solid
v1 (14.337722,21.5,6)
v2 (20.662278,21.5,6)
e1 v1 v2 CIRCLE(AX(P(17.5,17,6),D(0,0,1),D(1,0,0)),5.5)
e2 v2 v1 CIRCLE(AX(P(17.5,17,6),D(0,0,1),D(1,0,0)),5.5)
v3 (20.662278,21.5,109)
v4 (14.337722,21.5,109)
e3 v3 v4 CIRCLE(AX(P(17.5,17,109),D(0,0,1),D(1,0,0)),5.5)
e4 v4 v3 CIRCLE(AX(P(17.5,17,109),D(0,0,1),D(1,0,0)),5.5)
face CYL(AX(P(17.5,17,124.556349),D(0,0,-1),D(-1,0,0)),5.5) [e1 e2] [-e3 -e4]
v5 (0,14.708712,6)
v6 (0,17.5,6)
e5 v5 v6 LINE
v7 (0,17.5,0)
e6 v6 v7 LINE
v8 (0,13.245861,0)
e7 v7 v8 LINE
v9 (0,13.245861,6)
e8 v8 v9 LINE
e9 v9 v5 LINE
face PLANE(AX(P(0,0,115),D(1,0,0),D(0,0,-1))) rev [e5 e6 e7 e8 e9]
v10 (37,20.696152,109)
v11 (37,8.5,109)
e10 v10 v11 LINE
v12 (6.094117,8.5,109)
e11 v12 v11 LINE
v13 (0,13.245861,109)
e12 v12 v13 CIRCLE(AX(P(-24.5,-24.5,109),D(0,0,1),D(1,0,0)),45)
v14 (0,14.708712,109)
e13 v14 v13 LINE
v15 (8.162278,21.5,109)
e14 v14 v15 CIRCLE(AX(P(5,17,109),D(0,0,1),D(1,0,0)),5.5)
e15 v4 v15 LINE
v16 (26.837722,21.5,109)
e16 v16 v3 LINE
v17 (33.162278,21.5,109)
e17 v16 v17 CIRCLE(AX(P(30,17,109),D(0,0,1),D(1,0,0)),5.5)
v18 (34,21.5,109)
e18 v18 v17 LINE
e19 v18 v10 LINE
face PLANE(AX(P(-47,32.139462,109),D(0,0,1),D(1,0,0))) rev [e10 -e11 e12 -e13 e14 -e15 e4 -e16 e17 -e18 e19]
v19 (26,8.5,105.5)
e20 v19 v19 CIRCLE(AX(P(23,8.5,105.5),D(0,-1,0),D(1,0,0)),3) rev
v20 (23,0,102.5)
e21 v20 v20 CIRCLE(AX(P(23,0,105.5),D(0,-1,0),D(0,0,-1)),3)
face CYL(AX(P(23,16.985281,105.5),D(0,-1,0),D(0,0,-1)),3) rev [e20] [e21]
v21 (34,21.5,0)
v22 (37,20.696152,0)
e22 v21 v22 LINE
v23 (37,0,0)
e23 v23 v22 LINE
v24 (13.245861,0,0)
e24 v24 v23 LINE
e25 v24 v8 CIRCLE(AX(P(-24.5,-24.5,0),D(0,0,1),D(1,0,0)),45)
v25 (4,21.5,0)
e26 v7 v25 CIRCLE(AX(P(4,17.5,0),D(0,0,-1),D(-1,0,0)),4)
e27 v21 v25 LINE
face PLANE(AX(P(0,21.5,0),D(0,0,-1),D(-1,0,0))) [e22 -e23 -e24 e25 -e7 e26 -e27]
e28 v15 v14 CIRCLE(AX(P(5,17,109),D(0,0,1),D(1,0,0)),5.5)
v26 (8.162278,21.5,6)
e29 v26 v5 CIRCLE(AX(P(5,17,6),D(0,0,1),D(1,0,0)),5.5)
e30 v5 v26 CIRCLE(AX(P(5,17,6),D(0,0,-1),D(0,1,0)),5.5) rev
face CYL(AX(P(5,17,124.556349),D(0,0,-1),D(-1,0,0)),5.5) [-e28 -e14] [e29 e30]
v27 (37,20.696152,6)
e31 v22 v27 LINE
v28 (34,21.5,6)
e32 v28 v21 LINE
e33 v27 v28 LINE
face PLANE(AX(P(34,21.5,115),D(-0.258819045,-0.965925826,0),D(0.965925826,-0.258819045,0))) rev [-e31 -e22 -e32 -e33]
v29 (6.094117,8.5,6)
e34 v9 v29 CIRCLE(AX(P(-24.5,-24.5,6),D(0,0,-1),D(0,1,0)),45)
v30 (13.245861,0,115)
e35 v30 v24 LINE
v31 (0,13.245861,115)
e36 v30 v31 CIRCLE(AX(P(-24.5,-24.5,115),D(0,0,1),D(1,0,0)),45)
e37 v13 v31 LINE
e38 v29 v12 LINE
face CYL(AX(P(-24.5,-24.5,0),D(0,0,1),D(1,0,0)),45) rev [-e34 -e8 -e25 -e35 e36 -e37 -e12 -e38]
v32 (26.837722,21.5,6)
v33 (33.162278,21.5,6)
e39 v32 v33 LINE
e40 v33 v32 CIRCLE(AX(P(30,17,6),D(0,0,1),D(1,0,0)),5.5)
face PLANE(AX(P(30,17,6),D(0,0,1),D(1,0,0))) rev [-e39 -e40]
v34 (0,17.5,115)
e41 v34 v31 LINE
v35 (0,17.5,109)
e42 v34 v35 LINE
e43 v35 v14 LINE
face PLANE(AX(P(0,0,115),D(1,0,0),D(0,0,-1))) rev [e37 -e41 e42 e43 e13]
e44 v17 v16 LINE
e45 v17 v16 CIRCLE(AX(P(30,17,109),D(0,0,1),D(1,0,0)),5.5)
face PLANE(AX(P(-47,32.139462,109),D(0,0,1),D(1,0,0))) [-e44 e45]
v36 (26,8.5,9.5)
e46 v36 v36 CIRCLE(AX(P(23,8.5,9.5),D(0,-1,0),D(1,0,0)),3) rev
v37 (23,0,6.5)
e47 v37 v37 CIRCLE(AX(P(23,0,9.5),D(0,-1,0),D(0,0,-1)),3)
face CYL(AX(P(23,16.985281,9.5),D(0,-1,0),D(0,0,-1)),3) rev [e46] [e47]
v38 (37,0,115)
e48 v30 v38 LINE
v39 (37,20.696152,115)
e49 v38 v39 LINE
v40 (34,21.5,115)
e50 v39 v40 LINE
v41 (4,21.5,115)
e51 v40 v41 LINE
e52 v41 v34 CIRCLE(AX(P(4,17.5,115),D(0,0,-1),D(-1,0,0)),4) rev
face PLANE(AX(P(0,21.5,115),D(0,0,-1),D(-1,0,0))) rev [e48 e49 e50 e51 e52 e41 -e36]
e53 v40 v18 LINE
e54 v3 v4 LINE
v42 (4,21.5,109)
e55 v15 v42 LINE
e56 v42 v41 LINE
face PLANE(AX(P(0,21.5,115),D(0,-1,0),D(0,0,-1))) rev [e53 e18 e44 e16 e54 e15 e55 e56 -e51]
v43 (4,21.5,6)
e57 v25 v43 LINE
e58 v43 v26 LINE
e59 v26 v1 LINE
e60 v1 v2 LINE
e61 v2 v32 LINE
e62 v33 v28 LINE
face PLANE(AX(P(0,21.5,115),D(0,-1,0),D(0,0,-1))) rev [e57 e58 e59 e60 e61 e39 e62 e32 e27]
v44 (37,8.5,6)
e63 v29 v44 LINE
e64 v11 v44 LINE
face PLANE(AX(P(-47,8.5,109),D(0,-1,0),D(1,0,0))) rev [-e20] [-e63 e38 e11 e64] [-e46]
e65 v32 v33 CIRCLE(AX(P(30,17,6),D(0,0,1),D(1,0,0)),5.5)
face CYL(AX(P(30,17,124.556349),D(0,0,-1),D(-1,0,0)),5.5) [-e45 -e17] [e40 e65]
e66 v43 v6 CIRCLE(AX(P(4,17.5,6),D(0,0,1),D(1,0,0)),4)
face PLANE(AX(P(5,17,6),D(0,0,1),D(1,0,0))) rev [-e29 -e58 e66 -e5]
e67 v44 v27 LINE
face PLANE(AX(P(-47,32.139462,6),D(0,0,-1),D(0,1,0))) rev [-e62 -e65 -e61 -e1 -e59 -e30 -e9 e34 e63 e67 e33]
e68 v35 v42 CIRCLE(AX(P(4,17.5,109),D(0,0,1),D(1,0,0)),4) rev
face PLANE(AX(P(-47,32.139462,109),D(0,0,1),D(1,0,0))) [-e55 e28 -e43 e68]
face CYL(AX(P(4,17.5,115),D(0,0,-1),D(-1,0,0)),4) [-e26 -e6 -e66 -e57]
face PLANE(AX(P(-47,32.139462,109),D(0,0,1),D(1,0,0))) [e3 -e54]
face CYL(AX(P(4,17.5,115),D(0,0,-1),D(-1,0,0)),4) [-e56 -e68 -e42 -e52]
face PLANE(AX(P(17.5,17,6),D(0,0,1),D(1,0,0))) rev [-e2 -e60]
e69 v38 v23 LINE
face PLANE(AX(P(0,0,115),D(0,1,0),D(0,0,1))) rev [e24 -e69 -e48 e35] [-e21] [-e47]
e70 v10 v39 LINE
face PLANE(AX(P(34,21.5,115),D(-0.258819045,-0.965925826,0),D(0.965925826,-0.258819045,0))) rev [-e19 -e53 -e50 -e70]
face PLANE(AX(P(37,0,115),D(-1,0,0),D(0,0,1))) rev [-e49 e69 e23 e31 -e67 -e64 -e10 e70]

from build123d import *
from OCP.BRepFilletAPI import BRepFilletAPI_MakeChamfer

# Parameters (mm, degrees)
SCHIZZO1_W               = 37
SCHIZZO1_H               = 21.5
ESTRUSIONE1_DEPTH        = 115
SCHIZZO6_W               = 103
SCHIZZO6_H               = 23.639461627
TAGLIO_ESTRUSIONE4_DEPTH = 84
SCHIZZO7_R               = 5.5
ESTRUSIONE4_DEPTH        = 103
SMUSSO1_SIZE             = 3
SMUSSO1_SIZE2            = 0.803847577
RACCORDO1_R              = 4
SCHIZZO8_R               = 45
TAGLIO_ESTRUSIONE5_DEPTH = 123.883074506
SCHIZZO9_R               = 3
TAGLIO_ESTRUSIONE6_DEPTH = 8.5


with BuildPart() as part:
    # Schizzo1 → Estrusione1 (new body)
    with BuildSketch(Plane.XY):
        with Locations((18.5, 10.75)):
            Rectangle(SCHIZZO1_W, SCHIZZO1_H)
    extrude(amount=ESTRUSIONE1_DEPTH)

    # Schizzo6 → Taglio-Estrusione4 (cut)
    with BuildSketch(Plane(origin=(37, 0, 0), x_dir=(0, 0, -1), z_dir=(1, 0, 0))):
        with Locations((-57.5, 20.319730814)):
            Rectangle(SCHIZZO6_W, SCHIZZO6_H)
    extrude(amount=-TAGLIO_ESTRUSIONE4_DEPTH, mode=Mode.SUBTRACT)

    # Schizzo7 → Estrusione4 (add)
    with BuildSketch(Plane.XY.offset(6)):
        with Locations(Location((5, 17, 0), (0, 0, 155.380022671))):
            Circle(SCHIZZO7_R)
        with Locations(Location((17.5, 17, 0), (0, 0, 125.096801228))):
            Circle(SCHIZZO7_R)
        with Locations(Location((30, 17, 0), (0, 0, 125.096801228))):
            Circle(SCHIZZO7_R)
    extrude(amount=ESTRUSIONE4_DEPTH)

    # Smusso1: one chamfer whose edges measure the first distance from different faces: ONE call of the kernel's chamfer builder (chamfer() names one face for all edges)
    smusso1_edges_1 = [part.edges().sort_by_distance(p)[0] for p in [
        (37, 21.5, 3),
    ]]
    smusso1_side_1 = [part.faces().sort_by_distance(p)[0] for p in [
        (18.5, 21.5, 3),
    ]]
    smusso1_edges_2 = [part.edges().sort_by_distance(p)[0] for p in [
        (37, 21.5, 112),
    ]]
    smusso1_side_2 = [part.faces().sort_by_distance(p)[0] for p in [
        (18.5, 21.5, 112),
    ]]
    smusso1 = BRepFilletAPI_MakeChamfer(part.part.solid().wrapped)
    for e in smusso1_edges_1:
        smusso1.Add(SMUSSO1_SIZE, SMUSSO1_SIZE2, e.wrapped, smusso1_side_1[0].wrapped)  # the first distance lies on this face
    for e in smusso1_edges_2:
        smusso1.Add(SMUSSO1_SIZE, SMUSSO1_SIZE2, e.wrapped, smusso1_side_2[0].wrapped)  # the first distance lies on this face
    add(Compound.cast(smusso1.Shape()), mode=Mode.REPLACE)

    # Raccordo1
    # the kernel refuses this fillet: 4 mm, written as the material it takes off along each edge
    with BuildSketch(Plane(origin=(0, 21.5, -10), x_dir=(1, 0, 0), z_dir=(0, 0, 1))) as raccordo1_piece_1:
        with BuildLine():
            CenterArc((RACCORDO1_R, -RACCORDO1_R), RACCORDO1_R, 90, 90)
            Line((0, -RACCORDO1_R), (0, 0))
            Line((0, 0), (RACCORDO1_R, 0))
        make_face()
    extrude(amount=16, mode=Mode.SUBTRACT)
    with BuildSketch(Plane(origin=(0, 21.5, 109), x_dir=(0, -1, 0), z_dir=(0, 0, 1))) as raccordo1_piece_2:
        with BuildLine():
            CenterArc((RACCORDO1_R, RACCORDO1_R), RACCORDO1_R, 180, 90)
            Line((0, RACCORDO1_R), (0, 0))
            Line((0, 0), (RACCORDO1_R, 0))
        make_face()
    extrude(amount=16, mode=Mode.SUBTRACT)

    # Schizzo8 → Taglio-Estrusione5 (cut, through all)
    with BuildSketch(Plane.XY.offset(115)):
        with Locations((-24.5, -24.5)):
            Circle(SCHIZZO8_R)
    extrude(amount=-TAGLIO_ESTRUSIONE5_DEPTH, mode=Mode.SUBTRACT)

    # Schizzo9 → Taglio-Estrusione6 (cut)
    with BuildSketch(Plane.XZ):
        with Locations(Location((23, 105.5, 0), (0, 0, 270))):
            Circle(SCHIZZO9_R)
        with Locations(Location((23, 9.5, 0), (0, 0, 270))):
            Circle(SCHIZZO9_R)
    extrude(amount=-TAGLIO_ESTRUSIONE6_DEPTH, mode=Mode.SUBTRACT)


solid = part.part
